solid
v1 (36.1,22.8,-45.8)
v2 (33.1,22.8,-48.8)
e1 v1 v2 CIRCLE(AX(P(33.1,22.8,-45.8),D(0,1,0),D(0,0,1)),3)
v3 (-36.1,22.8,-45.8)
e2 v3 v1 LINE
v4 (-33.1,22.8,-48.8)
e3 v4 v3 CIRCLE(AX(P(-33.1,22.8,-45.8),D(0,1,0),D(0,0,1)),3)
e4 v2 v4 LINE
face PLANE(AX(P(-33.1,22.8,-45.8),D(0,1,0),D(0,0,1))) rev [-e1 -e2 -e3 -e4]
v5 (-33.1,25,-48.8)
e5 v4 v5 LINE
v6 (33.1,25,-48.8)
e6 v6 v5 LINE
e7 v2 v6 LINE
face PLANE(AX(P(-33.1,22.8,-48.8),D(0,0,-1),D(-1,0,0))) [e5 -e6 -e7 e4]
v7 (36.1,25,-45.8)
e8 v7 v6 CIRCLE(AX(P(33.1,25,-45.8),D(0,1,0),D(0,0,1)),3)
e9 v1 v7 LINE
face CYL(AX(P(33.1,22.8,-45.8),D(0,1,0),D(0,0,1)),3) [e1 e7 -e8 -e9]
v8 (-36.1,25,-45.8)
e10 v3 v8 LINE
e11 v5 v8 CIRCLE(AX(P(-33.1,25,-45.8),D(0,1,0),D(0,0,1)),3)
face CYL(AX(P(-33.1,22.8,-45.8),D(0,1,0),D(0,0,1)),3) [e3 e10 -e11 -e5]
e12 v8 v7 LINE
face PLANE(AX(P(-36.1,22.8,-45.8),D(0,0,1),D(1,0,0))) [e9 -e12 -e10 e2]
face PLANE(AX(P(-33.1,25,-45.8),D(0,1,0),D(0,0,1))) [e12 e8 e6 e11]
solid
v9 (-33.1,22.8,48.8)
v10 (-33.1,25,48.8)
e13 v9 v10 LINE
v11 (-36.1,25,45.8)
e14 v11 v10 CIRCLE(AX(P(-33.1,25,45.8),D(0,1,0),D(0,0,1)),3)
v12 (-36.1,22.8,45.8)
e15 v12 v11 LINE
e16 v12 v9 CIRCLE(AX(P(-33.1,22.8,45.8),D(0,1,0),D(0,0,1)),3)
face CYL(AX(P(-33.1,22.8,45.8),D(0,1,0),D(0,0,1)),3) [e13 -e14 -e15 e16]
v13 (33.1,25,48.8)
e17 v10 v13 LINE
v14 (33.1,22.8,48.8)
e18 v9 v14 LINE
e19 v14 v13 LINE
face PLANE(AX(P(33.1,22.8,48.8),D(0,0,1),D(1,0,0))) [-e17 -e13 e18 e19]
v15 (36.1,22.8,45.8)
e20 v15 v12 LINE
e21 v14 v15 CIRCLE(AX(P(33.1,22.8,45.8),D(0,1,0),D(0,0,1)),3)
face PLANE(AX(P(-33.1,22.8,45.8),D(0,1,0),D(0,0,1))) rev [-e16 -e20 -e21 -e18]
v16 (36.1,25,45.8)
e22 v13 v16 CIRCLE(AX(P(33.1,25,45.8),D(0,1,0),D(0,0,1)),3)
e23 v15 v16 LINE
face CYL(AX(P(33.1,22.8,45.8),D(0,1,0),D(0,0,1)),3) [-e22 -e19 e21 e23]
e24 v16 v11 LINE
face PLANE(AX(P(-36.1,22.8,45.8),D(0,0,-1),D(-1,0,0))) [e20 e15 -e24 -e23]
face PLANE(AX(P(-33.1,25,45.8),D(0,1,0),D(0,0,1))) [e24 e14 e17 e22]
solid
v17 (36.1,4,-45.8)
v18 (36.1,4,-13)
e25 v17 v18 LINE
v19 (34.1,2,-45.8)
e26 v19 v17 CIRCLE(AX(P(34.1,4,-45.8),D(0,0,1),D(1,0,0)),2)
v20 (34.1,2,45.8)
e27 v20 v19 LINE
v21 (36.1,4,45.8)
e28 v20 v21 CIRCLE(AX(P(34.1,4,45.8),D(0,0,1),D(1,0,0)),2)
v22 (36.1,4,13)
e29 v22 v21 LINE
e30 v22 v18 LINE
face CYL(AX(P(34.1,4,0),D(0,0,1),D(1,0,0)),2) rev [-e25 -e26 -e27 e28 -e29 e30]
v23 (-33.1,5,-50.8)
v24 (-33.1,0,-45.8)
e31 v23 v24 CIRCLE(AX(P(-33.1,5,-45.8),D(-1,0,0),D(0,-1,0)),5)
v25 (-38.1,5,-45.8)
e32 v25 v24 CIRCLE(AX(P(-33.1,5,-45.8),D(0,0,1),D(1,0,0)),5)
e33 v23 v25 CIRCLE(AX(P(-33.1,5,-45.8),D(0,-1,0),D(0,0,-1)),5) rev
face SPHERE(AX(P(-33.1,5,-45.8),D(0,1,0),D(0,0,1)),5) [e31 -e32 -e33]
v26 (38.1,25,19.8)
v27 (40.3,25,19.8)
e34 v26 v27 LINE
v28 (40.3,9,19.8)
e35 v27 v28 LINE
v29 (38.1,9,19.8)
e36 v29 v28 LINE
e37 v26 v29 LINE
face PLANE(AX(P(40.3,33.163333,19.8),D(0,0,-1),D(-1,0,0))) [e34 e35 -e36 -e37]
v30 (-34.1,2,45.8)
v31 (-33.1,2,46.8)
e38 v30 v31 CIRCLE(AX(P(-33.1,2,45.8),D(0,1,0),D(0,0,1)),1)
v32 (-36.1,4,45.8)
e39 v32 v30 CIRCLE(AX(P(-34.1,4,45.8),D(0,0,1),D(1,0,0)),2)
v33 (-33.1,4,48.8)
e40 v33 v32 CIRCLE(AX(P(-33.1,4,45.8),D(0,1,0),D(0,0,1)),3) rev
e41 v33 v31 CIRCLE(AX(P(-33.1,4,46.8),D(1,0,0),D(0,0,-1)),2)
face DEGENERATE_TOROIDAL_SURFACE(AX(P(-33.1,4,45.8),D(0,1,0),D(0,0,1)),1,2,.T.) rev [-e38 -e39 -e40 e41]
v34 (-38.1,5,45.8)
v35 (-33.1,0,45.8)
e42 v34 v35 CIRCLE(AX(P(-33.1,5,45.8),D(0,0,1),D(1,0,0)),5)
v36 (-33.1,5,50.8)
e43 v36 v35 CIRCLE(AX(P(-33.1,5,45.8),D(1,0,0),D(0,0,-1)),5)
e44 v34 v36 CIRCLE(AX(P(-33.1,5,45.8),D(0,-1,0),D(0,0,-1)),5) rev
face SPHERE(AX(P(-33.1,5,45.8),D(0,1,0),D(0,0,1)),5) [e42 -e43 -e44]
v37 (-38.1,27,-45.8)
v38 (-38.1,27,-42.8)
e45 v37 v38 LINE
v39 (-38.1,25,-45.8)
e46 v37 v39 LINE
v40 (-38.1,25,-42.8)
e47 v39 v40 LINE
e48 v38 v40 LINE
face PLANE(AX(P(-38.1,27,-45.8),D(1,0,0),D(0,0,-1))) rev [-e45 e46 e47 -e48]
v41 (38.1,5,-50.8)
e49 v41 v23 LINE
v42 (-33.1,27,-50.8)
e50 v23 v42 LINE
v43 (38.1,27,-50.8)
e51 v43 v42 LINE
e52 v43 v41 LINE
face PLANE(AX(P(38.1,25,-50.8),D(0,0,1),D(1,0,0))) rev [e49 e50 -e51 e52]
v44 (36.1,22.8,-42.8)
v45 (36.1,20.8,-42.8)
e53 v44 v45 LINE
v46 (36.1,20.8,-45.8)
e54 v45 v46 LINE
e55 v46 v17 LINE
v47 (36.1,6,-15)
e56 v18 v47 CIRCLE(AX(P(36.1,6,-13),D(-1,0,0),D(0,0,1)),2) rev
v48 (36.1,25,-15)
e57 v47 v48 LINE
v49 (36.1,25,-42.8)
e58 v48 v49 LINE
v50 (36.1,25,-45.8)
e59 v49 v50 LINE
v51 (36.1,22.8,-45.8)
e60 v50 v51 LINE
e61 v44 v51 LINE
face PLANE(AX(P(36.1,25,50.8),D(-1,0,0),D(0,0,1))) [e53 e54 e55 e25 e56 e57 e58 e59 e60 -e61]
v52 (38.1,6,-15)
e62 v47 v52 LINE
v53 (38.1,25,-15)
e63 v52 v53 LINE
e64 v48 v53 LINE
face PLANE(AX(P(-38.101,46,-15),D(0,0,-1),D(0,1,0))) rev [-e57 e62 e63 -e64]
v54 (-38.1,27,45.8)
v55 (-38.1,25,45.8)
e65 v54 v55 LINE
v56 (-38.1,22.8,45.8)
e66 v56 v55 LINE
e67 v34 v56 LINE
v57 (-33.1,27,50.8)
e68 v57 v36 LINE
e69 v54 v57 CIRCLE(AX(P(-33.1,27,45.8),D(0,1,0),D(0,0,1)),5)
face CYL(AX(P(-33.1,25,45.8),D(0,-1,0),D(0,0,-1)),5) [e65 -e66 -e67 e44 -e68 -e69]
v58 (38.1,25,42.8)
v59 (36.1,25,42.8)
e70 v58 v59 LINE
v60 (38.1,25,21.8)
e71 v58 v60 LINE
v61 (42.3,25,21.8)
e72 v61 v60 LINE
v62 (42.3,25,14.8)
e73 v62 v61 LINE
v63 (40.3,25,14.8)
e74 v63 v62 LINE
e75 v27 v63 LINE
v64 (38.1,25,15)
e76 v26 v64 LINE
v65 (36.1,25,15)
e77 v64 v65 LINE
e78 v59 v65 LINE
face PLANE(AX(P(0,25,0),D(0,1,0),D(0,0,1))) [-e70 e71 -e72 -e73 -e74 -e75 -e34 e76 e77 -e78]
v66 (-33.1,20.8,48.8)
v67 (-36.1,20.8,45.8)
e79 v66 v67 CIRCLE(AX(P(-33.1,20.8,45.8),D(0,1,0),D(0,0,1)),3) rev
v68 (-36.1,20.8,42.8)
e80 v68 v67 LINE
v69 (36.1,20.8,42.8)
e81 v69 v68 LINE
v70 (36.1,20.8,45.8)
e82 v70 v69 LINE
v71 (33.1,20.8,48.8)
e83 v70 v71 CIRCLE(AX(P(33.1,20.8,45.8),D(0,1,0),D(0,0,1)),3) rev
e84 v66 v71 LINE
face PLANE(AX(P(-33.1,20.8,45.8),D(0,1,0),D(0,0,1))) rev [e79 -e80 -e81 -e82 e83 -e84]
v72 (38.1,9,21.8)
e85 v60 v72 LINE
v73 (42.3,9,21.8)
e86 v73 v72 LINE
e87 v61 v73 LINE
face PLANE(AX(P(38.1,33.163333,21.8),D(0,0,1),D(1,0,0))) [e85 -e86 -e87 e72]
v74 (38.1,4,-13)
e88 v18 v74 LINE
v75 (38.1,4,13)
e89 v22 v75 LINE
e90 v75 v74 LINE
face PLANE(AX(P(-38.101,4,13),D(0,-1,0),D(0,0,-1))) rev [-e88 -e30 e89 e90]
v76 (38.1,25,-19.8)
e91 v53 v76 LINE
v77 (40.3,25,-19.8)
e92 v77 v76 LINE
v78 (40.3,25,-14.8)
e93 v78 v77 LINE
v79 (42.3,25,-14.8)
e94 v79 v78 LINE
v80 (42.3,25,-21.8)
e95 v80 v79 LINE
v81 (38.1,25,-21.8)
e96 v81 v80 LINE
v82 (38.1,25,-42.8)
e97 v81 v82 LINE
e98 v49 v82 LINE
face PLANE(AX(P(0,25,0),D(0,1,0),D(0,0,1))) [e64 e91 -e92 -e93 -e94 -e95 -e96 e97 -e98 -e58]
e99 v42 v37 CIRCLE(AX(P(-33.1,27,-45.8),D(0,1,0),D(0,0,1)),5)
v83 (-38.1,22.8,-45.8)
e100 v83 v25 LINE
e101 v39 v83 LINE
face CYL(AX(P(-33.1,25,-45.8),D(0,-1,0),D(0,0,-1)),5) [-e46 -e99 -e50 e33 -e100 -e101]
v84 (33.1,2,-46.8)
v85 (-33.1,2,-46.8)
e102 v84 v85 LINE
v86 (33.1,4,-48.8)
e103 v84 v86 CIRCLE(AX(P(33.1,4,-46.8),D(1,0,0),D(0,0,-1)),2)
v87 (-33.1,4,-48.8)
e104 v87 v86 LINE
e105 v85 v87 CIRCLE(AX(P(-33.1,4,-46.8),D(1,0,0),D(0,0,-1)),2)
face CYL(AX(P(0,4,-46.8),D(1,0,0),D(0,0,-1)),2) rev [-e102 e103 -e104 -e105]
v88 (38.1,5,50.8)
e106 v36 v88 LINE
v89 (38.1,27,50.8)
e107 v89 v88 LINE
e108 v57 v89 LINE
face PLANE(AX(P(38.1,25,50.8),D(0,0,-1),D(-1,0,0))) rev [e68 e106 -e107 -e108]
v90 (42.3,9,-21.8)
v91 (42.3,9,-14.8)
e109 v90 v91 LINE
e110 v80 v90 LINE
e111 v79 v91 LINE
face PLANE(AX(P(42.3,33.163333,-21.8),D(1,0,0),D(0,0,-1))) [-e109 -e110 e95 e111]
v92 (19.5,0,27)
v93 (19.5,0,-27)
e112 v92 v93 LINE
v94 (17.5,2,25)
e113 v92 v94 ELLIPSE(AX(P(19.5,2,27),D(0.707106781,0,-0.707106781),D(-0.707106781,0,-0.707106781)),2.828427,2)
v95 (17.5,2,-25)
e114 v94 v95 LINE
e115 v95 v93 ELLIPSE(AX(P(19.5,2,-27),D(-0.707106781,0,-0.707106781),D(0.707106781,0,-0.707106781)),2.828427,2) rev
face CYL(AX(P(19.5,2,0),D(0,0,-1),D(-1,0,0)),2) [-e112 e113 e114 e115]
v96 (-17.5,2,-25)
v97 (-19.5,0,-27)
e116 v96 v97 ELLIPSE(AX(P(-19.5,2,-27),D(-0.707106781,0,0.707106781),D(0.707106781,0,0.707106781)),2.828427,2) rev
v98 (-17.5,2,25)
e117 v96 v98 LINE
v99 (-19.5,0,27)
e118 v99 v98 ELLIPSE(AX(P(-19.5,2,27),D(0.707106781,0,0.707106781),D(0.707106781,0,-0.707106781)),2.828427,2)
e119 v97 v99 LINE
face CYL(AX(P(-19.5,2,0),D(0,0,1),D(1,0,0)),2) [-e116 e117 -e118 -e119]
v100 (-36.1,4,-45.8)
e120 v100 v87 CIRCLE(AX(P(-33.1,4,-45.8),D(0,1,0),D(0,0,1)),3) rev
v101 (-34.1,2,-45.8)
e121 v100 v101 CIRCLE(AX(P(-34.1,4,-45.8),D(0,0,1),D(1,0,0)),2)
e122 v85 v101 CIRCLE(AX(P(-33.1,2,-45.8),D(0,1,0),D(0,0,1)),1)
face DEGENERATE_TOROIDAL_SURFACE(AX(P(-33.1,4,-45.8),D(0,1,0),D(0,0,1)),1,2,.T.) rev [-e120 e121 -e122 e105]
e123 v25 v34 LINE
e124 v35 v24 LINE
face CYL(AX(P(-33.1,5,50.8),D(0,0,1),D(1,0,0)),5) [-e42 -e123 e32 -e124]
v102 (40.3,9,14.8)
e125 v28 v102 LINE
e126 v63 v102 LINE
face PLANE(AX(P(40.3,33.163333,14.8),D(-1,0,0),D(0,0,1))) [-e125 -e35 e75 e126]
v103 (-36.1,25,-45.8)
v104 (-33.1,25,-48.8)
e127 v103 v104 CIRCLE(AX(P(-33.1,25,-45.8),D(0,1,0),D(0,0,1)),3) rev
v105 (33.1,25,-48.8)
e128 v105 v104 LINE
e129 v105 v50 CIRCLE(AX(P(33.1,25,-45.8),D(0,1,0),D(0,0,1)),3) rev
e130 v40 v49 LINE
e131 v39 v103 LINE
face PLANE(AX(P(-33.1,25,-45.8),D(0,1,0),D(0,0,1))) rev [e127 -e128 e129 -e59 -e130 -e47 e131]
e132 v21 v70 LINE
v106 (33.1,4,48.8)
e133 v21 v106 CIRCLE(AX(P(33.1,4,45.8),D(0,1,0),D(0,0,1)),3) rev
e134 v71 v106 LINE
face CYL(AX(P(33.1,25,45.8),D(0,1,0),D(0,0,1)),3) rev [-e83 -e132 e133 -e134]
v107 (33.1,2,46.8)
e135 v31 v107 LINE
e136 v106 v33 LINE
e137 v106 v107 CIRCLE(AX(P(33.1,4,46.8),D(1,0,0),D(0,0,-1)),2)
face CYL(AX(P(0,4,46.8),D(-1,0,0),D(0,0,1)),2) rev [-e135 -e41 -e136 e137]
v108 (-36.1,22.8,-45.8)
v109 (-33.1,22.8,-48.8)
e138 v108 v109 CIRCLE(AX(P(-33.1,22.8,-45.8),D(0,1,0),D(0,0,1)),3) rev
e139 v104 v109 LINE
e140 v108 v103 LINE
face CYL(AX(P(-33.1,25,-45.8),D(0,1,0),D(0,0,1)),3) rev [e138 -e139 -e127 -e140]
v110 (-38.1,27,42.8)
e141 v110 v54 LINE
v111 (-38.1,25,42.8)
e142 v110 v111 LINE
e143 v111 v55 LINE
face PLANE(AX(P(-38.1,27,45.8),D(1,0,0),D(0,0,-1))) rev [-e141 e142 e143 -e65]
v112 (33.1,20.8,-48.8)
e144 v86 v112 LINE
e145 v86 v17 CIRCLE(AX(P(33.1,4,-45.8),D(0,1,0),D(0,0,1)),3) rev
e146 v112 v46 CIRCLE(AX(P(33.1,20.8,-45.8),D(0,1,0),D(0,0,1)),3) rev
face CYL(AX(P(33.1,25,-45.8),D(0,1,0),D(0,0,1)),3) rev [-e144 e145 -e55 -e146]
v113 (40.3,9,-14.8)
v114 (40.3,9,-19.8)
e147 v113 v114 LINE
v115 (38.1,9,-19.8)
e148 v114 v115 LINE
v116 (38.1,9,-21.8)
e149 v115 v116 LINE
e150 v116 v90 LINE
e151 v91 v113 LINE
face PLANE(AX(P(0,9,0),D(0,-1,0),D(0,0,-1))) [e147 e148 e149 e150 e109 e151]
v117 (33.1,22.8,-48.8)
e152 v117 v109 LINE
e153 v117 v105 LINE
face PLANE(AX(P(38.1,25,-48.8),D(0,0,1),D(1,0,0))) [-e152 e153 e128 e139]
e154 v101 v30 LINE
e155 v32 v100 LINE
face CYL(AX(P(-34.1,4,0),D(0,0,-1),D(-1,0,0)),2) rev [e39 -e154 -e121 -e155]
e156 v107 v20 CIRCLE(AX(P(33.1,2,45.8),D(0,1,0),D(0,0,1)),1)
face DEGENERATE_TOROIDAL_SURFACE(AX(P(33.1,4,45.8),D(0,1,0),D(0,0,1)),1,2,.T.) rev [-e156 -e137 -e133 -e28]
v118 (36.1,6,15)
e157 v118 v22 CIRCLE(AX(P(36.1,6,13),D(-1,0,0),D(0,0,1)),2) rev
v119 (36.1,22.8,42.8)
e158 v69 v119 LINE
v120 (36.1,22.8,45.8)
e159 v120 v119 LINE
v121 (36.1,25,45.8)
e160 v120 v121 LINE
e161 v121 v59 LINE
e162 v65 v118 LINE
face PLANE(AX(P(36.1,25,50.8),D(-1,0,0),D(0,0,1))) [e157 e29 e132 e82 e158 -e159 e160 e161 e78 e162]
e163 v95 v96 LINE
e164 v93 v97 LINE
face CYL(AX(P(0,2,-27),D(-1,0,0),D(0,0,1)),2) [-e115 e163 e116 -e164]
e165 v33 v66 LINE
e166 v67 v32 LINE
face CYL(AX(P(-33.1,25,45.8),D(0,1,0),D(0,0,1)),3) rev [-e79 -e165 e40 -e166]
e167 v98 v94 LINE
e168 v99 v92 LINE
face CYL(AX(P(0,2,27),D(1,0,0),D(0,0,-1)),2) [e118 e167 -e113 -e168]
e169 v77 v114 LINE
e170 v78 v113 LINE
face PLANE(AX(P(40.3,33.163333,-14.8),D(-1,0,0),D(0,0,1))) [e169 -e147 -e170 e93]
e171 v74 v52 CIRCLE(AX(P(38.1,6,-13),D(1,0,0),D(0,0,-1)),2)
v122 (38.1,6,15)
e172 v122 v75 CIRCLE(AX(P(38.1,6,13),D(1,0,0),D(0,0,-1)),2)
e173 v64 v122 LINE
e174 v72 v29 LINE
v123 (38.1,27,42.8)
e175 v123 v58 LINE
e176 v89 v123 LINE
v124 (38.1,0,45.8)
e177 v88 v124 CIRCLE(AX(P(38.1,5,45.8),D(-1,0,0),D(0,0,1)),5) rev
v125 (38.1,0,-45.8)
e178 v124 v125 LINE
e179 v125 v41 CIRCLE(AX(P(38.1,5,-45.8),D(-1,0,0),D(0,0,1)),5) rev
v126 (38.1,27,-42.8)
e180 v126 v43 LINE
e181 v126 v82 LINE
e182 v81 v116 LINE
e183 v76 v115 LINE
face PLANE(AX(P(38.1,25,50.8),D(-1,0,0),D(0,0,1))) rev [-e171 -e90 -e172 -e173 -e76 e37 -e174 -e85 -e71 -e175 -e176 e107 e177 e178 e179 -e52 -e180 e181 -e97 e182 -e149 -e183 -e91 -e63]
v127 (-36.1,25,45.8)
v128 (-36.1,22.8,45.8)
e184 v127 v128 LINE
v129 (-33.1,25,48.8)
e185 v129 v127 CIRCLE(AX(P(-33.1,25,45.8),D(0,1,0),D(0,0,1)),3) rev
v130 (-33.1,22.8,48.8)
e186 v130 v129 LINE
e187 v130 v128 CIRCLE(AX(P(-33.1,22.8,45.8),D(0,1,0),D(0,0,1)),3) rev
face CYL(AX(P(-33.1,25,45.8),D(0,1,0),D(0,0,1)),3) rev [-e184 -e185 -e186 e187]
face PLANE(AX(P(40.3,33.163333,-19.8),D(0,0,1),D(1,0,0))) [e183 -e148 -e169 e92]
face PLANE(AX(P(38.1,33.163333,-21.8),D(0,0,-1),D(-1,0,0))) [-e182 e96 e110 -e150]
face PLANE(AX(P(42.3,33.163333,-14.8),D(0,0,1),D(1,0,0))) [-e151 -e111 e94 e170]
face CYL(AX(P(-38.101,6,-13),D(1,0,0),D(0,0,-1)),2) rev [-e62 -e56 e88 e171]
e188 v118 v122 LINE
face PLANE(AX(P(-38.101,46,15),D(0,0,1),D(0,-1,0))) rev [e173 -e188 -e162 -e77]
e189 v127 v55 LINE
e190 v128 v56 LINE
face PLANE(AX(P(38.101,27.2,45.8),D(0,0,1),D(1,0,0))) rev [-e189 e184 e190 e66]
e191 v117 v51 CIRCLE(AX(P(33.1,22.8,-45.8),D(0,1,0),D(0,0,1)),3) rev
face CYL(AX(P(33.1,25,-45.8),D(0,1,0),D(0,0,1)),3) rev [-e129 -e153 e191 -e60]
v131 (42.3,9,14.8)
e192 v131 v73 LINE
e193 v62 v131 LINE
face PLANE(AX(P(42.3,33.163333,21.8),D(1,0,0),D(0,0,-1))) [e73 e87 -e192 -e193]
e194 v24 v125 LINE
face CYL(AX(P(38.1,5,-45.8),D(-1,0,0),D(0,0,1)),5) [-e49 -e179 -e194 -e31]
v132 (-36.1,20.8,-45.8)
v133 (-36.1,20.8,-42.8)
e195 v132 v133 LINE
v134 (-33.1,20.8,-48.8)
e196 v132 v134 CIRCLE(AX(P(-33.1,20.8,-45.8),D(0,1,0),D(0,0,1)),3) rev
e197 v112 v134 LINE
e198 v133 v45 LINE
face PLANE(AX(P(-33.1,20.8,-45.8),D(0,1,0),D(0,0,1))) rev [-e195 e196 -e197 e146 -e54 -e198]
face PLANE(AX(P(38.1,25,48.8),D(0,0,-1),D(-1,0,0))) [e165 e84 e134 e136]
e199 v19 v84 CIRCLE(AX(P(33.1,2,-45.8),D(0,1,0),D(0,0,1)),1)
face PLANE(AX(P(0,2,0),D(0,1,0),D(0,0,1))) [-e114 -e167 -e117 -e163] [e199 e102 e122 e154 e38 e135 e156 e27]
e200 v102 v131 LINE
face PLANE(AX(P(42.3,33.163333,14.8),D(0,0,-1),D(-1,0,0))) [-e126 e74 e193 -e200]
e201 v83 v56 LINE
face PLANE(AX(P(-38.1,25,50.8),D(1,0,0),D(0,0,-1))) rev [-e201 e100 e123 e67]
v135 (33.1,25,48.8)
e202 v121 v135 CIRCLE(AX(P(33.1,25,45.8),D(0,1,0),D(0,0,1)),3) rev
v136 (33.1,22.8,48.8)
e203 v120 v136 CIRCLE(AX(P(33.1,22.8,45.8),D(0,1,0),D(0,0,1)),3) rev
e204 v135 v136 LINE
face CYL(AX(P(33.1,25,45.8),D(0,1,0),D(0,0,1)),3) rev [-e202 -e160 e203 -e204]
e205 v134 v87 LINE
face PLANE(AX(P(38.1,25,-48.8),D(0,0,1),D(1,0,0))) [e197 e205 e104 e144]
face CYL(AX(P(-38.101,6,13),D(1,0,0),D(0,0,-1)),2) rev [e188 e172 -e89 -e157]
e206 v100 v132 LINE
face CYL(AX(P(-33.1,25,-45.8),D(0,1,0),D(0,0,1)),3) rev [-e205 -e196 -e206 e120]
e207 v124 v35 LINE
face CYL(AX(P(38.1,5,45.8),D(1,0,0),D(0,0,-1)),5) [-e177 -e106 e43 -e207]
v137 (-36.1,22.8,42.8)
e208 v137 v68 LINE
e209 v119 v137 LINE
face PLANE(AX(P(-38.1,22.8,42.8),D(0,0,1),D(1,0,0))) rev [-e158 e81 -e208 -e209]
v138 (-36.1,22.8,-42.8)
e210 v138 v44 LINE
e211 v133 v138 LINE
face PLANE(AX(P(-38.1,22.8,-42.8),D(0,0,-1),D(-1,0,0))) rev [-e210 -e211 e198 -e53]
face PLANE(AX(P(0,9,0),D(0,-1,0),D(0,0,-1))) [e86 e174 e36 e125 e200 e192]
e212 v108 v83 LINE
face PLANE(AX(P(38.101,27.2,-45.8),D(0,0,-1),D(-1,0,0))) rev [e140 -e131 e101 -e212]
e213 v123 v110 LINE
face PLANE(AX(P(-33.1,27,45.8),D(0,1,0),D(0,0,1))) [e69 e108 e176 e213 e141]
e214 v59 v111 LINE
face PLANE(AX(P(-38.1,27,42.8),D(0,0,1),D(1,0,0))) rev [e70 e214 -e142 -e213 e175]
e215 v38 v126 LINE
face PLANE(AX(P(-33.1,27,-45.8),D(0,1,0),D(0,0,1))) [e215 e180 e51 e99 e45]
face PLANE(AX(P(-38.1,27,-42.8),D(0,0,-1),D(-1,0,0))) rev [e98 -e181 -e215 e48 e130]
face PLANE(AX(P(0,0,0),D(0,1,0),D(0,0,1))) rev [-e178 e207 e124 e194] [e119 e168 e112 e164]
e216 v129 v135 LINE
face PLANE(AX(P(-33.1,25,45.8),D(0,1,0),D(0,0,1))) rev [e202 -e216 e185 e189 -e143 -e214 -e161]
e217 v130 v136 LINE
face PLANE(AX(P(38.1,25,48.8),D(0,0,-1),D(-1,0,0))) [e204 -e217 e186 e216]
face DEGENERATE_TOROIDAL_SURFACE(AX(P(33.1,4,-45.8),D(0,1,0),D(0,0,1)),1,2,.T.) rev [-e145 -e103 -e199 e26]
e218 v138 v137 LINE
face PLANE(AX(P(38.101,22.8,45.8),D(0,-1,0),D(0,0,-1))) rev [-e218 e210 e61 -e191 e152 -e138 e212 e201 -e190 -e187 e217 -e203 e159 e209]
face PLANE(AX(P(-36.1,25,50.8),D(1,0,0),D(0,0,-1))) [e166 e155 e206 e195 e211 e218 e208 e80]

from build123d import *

# Parameters (mm, degrees)
SKETCH1_W             = 76.2
SKETCH1_H             = 101.6
BOSS_EXTRUDE1_DEPTH   = 25
SHELL1_T              = -2
SKETCH2_W             = 35
SKETCH2_H             = 50
CUT_EXTRUDE1_DEPTH    = 25
CUT_EXTRUDE2_REACH    = 96.932
FILLET1_R             = 5
FILLET2_R             = 3
FILLET3_R             = 2
FILLET4_R             = 5
BOSS_EXTRUDE4_DEPTH   = 2.2
BOSS_EXTRUDE4_2_DEPTH = 2.2
SKETCH4_W             = 91.6
SKETCH4_H             = 4.4
CUT_EXTRUDE3_DEPTH    = 2
BOSS_EXTRUDE2_START   = 2
BOSS_EXTRUDE2_DEPTH   = 2
LPATTERN1_COUNT       = 2
LPATTERN1_PITCH       = 4.2
BOSS_EXTRUDE3_START   = -9
BOSS_EXTRUDE3_DEPTH   = 16
FILLET5_R             = 2


with BuildPart() as part:
    # Sketch1 → Boss-Extrude1 (new body)
    with BuildSketch(Plane(origin=(0, 0, 0), x_dir=(1, 0, 0), z_dir=(0, 1, 0))):
        Rectangle(SKETCH1_W, SKETCH1_H)
    extrude(amount=BOSS_EXTRUDE1_DEPTH)

    # Shell1
    shell1_openings = [part.faces().sort_by_distance(p)[0] for p in [
        (0, 25, 0),
    ]]
    offset(amount=SHELL1_T, openings=shell1_openings, kind=Kind.INTERSECTION)

    # Sketch2 → Cut-Extrude1 (cut)
    with BuildSketch(Plane(origin=(0, 2, 0), x_dir=(1, 0, 0), z_dir=(0, 1, 0))):
        Rectangle(SKETCH2_W, SKETCH2_H)
    extrude(amount=-CUT_EXTRUDE1_DEPTH, mode=Mode.SUBTRACT)

    # Sketch3 → Cut-Extrude2 (cut, up to next)
    with BuildSketch(Plane(origin=(38.1, 0, 0), x_dir=(0, 0, -1), z_dir=(1, 0, 0)), mode=Mode.PRIVATE) as cut_extrude2_sk1:
        with BuildLine():
            Line((-15, 46), (15, 46))
            Line((15, 46), (15, 6))
            ThreePointArc((15, 6), (14.414213562, 4.585786438), (13, 4))
            Line((13, 4), (-13, 4))
            ThreePointArc((-13, 4), (-14.414213562, 4.585786438), (-15, 6))
            Line((-15, 6), (-15, 46))
        make_face()
    cut_extrude2_tool1 = extrude(cut_extrude2_sk1.sketch, amount=-CUT_EXTRUDE2_REACH, mode=Mode.PRIVATE) & part.part
    add(cut_extrude2_tool1.solids().sort_by_distance((38.1, 25.028043, 0))[0], mode=Mode.SUBTRACT)

    # Fillet1
    fillet1_edges = [part.edges().sort_by_distance(p)[0] for p in [
        (-38.1, 12.5, -50.8),
        (-38.1, 12.5, 50.8),
    ]]
    fillet(fillet1_edges, radius=FILLET1_R)

    # Fillet2
    fillet2_edges = [part.edges().sort_by_distance(p)[0] for p in [
        (-36.1, 13.5, -48.8),
        (-36.1, 13.5, 48.8),
        (36.1, 13.5, 48.8),
        (36.1, 13.5, -48.8),
    ]]
    fillet(fillet2_edges, radius=FILLET2_R)

    # Fillet3
    fillet3_edges = [part.edges().sort_by_distance(p)[0] for p in [
        (36.1, 2, 0),
        (-36.1, 2, 0),
        (0, 2, 48.8),
        (0, 2, -48.8),
        (-35.221320344, 2, -47.921320344),
        (-35.221320344, 2, 47.921320344),
        (35.221320344, 2, 47.921320344),
        (35.221320344, 2, -47.921320344),
    ]]
    fillet(fillet3_edges, radius=FILLET3_R - 0.0001)  # a hair under: the kernel refuses the full size

    # Fillet4
    fillet4_edges = [part.edges().sort_by_distance(p)[0] for p in [
        (2.5, 0, -50.8),
        (2.5, 0, 50.8),
        (-38.1, 0, 0),
        (-36.635533906, 0, -49.335533906),
        (-36.635533906, 0, 49.335533906),
    ]]
    fillet(fillet4_edges, radius=FILLET4_R)

    # Sketch4 → Cut-Extrude3 (cut)
    with BuildSketch(Plane.ZY.offset(38.1)):
        with Locations((0, 25)):
            Rectangle(SKETCH4_W, SKETCH4_H)
    extrude(amount=-CUT_EXTRUDE3_DEPTH, mode=Mode.SUBTRACT)

    # Sketch5 → Boss-Extrude2 (add)
    with BuildSketch(Plane(origin=(0, 25, 0), x_dir=(1, 0, 0), z_dir=(0, 1, 0)).offset(BOSS_EXTRUDE2_START)):
        with BuildLine():
            Line((-33.1, -50.8), (38.1, -50.8))
            Line((38.1, -50.8), (38.1, -42.8))
            Line((38.1, -42.8), (-38.1, -42.8))
            Line((-38.1, -42.8), (-38.1, -45.8))
            ThreePointArc((-38.1, -45.8), (-36.635533906, -49.335533906), (-33.1, -50.8))
        make_face()
        with BuildLine():
            Line((38.1, 50.8), (-33.1, 50.8))
            ThreePointArc((-33.1, 50.8), (-36.635533906, 49.335533906), (-38.1, 45.8))
            Line((-38.1, 45.8), (-38.1, 42.8))
            Line((-38.1, 42.8), (38.1, 42.8))
            Line((38.1, 42.8), (38.1, 50.8))
        make_face()
    boss_extrude2 = extrude(amount=-BOSS_EXTRUDE2_DEPTH)

    # LPattern1: Boss-Extrude2 ×2
    with Locations(*[(0, -i * LPATTERN1_PITCH, 0) for i in range(1, LPATTERN1_COUNT)]):
        add(boss_extrude2)

    # Sketch6 → Boss-Extrude3 (add)
    with BuildSketch(Plane.XZ.offset(BOSS_EXTRUDE3_START)):
        Polygon((38.1, -19.8), (38.1, -21.8), (42.3, -21.8), (42.3, -14.8), (40.3, -14.8), (40.3, -19.8), align=None)
        Polygon((40.3, 19.8), (38.1, 19.8), (38.1, 21.8), (42.3, 21.8), (42.3, 14.8), (40.3, 14.8), align=None)
    extrude(amount=-BOSS_EXTRUDE3_DEPTH)

    # Fillet5
    fillet5_edges = [part.edges().sort_by_distance(p)[0] for p in [
        (17.5, 0, 0),
        (0, 0, 25),
        (-17.5, 0, 0),
        (0, 0, -25),
    ]]
    fillet(fillet5_edges, radius=FILLET5_R - 0.0001)  # a hair under: the kernel refuses the full size


with BuildPart() as body_2:
    # Sketch7 → Boss-Extrude4 (new body)
    with BuildSketch(Plane(origin=(0, 25, 0), x_dir=(1, 0, 0), z_dir=(0, 1, 0))):
        with BuildLine():
            Line((-36.1, -45.8), (36.1, -45.8))
            ThreePointArc((36.1, -45.8), (35.221320344, -47.921320344), (33.1, -48.8))
            Line((33.1, -48.8), (-33.1, -48.8))
            ThreePointArc((-33.1, -48.8), (-35.221320344, -47.921320344), (-36.1, -45.8))
        make_face()
    extrude(amount=-BOSS_EXTRUDE4_DEPTH)


with BuildPart() as body_3:
    # Sketch7 → Boss-Extrude4 2 (new body)
    with BuildSketch(Plane(origin=(0, 25, 0), x_dir=(1, 0, 0), z_dir=(0, 1, 0))):
        with BuildLine():
            Line((-33.1, 48.8), (33.1, 48.8))
            ThreePointArc((33.1, 48.8), (35.221320344, 47.921320344), (36.1, 45.8))
            Line((36.1, 45.8), (-36.1, 45.8))
            ThreePointArc((-36.1, 45.8), (-35.221320344, 47.921320344), (-33.1, 48.8))
        make_face()
    extrude(amount=-BOSS_EXTRUDE4_2_DEPTH)


solid = Compound([part.part, body_2.part, body_3.part])
